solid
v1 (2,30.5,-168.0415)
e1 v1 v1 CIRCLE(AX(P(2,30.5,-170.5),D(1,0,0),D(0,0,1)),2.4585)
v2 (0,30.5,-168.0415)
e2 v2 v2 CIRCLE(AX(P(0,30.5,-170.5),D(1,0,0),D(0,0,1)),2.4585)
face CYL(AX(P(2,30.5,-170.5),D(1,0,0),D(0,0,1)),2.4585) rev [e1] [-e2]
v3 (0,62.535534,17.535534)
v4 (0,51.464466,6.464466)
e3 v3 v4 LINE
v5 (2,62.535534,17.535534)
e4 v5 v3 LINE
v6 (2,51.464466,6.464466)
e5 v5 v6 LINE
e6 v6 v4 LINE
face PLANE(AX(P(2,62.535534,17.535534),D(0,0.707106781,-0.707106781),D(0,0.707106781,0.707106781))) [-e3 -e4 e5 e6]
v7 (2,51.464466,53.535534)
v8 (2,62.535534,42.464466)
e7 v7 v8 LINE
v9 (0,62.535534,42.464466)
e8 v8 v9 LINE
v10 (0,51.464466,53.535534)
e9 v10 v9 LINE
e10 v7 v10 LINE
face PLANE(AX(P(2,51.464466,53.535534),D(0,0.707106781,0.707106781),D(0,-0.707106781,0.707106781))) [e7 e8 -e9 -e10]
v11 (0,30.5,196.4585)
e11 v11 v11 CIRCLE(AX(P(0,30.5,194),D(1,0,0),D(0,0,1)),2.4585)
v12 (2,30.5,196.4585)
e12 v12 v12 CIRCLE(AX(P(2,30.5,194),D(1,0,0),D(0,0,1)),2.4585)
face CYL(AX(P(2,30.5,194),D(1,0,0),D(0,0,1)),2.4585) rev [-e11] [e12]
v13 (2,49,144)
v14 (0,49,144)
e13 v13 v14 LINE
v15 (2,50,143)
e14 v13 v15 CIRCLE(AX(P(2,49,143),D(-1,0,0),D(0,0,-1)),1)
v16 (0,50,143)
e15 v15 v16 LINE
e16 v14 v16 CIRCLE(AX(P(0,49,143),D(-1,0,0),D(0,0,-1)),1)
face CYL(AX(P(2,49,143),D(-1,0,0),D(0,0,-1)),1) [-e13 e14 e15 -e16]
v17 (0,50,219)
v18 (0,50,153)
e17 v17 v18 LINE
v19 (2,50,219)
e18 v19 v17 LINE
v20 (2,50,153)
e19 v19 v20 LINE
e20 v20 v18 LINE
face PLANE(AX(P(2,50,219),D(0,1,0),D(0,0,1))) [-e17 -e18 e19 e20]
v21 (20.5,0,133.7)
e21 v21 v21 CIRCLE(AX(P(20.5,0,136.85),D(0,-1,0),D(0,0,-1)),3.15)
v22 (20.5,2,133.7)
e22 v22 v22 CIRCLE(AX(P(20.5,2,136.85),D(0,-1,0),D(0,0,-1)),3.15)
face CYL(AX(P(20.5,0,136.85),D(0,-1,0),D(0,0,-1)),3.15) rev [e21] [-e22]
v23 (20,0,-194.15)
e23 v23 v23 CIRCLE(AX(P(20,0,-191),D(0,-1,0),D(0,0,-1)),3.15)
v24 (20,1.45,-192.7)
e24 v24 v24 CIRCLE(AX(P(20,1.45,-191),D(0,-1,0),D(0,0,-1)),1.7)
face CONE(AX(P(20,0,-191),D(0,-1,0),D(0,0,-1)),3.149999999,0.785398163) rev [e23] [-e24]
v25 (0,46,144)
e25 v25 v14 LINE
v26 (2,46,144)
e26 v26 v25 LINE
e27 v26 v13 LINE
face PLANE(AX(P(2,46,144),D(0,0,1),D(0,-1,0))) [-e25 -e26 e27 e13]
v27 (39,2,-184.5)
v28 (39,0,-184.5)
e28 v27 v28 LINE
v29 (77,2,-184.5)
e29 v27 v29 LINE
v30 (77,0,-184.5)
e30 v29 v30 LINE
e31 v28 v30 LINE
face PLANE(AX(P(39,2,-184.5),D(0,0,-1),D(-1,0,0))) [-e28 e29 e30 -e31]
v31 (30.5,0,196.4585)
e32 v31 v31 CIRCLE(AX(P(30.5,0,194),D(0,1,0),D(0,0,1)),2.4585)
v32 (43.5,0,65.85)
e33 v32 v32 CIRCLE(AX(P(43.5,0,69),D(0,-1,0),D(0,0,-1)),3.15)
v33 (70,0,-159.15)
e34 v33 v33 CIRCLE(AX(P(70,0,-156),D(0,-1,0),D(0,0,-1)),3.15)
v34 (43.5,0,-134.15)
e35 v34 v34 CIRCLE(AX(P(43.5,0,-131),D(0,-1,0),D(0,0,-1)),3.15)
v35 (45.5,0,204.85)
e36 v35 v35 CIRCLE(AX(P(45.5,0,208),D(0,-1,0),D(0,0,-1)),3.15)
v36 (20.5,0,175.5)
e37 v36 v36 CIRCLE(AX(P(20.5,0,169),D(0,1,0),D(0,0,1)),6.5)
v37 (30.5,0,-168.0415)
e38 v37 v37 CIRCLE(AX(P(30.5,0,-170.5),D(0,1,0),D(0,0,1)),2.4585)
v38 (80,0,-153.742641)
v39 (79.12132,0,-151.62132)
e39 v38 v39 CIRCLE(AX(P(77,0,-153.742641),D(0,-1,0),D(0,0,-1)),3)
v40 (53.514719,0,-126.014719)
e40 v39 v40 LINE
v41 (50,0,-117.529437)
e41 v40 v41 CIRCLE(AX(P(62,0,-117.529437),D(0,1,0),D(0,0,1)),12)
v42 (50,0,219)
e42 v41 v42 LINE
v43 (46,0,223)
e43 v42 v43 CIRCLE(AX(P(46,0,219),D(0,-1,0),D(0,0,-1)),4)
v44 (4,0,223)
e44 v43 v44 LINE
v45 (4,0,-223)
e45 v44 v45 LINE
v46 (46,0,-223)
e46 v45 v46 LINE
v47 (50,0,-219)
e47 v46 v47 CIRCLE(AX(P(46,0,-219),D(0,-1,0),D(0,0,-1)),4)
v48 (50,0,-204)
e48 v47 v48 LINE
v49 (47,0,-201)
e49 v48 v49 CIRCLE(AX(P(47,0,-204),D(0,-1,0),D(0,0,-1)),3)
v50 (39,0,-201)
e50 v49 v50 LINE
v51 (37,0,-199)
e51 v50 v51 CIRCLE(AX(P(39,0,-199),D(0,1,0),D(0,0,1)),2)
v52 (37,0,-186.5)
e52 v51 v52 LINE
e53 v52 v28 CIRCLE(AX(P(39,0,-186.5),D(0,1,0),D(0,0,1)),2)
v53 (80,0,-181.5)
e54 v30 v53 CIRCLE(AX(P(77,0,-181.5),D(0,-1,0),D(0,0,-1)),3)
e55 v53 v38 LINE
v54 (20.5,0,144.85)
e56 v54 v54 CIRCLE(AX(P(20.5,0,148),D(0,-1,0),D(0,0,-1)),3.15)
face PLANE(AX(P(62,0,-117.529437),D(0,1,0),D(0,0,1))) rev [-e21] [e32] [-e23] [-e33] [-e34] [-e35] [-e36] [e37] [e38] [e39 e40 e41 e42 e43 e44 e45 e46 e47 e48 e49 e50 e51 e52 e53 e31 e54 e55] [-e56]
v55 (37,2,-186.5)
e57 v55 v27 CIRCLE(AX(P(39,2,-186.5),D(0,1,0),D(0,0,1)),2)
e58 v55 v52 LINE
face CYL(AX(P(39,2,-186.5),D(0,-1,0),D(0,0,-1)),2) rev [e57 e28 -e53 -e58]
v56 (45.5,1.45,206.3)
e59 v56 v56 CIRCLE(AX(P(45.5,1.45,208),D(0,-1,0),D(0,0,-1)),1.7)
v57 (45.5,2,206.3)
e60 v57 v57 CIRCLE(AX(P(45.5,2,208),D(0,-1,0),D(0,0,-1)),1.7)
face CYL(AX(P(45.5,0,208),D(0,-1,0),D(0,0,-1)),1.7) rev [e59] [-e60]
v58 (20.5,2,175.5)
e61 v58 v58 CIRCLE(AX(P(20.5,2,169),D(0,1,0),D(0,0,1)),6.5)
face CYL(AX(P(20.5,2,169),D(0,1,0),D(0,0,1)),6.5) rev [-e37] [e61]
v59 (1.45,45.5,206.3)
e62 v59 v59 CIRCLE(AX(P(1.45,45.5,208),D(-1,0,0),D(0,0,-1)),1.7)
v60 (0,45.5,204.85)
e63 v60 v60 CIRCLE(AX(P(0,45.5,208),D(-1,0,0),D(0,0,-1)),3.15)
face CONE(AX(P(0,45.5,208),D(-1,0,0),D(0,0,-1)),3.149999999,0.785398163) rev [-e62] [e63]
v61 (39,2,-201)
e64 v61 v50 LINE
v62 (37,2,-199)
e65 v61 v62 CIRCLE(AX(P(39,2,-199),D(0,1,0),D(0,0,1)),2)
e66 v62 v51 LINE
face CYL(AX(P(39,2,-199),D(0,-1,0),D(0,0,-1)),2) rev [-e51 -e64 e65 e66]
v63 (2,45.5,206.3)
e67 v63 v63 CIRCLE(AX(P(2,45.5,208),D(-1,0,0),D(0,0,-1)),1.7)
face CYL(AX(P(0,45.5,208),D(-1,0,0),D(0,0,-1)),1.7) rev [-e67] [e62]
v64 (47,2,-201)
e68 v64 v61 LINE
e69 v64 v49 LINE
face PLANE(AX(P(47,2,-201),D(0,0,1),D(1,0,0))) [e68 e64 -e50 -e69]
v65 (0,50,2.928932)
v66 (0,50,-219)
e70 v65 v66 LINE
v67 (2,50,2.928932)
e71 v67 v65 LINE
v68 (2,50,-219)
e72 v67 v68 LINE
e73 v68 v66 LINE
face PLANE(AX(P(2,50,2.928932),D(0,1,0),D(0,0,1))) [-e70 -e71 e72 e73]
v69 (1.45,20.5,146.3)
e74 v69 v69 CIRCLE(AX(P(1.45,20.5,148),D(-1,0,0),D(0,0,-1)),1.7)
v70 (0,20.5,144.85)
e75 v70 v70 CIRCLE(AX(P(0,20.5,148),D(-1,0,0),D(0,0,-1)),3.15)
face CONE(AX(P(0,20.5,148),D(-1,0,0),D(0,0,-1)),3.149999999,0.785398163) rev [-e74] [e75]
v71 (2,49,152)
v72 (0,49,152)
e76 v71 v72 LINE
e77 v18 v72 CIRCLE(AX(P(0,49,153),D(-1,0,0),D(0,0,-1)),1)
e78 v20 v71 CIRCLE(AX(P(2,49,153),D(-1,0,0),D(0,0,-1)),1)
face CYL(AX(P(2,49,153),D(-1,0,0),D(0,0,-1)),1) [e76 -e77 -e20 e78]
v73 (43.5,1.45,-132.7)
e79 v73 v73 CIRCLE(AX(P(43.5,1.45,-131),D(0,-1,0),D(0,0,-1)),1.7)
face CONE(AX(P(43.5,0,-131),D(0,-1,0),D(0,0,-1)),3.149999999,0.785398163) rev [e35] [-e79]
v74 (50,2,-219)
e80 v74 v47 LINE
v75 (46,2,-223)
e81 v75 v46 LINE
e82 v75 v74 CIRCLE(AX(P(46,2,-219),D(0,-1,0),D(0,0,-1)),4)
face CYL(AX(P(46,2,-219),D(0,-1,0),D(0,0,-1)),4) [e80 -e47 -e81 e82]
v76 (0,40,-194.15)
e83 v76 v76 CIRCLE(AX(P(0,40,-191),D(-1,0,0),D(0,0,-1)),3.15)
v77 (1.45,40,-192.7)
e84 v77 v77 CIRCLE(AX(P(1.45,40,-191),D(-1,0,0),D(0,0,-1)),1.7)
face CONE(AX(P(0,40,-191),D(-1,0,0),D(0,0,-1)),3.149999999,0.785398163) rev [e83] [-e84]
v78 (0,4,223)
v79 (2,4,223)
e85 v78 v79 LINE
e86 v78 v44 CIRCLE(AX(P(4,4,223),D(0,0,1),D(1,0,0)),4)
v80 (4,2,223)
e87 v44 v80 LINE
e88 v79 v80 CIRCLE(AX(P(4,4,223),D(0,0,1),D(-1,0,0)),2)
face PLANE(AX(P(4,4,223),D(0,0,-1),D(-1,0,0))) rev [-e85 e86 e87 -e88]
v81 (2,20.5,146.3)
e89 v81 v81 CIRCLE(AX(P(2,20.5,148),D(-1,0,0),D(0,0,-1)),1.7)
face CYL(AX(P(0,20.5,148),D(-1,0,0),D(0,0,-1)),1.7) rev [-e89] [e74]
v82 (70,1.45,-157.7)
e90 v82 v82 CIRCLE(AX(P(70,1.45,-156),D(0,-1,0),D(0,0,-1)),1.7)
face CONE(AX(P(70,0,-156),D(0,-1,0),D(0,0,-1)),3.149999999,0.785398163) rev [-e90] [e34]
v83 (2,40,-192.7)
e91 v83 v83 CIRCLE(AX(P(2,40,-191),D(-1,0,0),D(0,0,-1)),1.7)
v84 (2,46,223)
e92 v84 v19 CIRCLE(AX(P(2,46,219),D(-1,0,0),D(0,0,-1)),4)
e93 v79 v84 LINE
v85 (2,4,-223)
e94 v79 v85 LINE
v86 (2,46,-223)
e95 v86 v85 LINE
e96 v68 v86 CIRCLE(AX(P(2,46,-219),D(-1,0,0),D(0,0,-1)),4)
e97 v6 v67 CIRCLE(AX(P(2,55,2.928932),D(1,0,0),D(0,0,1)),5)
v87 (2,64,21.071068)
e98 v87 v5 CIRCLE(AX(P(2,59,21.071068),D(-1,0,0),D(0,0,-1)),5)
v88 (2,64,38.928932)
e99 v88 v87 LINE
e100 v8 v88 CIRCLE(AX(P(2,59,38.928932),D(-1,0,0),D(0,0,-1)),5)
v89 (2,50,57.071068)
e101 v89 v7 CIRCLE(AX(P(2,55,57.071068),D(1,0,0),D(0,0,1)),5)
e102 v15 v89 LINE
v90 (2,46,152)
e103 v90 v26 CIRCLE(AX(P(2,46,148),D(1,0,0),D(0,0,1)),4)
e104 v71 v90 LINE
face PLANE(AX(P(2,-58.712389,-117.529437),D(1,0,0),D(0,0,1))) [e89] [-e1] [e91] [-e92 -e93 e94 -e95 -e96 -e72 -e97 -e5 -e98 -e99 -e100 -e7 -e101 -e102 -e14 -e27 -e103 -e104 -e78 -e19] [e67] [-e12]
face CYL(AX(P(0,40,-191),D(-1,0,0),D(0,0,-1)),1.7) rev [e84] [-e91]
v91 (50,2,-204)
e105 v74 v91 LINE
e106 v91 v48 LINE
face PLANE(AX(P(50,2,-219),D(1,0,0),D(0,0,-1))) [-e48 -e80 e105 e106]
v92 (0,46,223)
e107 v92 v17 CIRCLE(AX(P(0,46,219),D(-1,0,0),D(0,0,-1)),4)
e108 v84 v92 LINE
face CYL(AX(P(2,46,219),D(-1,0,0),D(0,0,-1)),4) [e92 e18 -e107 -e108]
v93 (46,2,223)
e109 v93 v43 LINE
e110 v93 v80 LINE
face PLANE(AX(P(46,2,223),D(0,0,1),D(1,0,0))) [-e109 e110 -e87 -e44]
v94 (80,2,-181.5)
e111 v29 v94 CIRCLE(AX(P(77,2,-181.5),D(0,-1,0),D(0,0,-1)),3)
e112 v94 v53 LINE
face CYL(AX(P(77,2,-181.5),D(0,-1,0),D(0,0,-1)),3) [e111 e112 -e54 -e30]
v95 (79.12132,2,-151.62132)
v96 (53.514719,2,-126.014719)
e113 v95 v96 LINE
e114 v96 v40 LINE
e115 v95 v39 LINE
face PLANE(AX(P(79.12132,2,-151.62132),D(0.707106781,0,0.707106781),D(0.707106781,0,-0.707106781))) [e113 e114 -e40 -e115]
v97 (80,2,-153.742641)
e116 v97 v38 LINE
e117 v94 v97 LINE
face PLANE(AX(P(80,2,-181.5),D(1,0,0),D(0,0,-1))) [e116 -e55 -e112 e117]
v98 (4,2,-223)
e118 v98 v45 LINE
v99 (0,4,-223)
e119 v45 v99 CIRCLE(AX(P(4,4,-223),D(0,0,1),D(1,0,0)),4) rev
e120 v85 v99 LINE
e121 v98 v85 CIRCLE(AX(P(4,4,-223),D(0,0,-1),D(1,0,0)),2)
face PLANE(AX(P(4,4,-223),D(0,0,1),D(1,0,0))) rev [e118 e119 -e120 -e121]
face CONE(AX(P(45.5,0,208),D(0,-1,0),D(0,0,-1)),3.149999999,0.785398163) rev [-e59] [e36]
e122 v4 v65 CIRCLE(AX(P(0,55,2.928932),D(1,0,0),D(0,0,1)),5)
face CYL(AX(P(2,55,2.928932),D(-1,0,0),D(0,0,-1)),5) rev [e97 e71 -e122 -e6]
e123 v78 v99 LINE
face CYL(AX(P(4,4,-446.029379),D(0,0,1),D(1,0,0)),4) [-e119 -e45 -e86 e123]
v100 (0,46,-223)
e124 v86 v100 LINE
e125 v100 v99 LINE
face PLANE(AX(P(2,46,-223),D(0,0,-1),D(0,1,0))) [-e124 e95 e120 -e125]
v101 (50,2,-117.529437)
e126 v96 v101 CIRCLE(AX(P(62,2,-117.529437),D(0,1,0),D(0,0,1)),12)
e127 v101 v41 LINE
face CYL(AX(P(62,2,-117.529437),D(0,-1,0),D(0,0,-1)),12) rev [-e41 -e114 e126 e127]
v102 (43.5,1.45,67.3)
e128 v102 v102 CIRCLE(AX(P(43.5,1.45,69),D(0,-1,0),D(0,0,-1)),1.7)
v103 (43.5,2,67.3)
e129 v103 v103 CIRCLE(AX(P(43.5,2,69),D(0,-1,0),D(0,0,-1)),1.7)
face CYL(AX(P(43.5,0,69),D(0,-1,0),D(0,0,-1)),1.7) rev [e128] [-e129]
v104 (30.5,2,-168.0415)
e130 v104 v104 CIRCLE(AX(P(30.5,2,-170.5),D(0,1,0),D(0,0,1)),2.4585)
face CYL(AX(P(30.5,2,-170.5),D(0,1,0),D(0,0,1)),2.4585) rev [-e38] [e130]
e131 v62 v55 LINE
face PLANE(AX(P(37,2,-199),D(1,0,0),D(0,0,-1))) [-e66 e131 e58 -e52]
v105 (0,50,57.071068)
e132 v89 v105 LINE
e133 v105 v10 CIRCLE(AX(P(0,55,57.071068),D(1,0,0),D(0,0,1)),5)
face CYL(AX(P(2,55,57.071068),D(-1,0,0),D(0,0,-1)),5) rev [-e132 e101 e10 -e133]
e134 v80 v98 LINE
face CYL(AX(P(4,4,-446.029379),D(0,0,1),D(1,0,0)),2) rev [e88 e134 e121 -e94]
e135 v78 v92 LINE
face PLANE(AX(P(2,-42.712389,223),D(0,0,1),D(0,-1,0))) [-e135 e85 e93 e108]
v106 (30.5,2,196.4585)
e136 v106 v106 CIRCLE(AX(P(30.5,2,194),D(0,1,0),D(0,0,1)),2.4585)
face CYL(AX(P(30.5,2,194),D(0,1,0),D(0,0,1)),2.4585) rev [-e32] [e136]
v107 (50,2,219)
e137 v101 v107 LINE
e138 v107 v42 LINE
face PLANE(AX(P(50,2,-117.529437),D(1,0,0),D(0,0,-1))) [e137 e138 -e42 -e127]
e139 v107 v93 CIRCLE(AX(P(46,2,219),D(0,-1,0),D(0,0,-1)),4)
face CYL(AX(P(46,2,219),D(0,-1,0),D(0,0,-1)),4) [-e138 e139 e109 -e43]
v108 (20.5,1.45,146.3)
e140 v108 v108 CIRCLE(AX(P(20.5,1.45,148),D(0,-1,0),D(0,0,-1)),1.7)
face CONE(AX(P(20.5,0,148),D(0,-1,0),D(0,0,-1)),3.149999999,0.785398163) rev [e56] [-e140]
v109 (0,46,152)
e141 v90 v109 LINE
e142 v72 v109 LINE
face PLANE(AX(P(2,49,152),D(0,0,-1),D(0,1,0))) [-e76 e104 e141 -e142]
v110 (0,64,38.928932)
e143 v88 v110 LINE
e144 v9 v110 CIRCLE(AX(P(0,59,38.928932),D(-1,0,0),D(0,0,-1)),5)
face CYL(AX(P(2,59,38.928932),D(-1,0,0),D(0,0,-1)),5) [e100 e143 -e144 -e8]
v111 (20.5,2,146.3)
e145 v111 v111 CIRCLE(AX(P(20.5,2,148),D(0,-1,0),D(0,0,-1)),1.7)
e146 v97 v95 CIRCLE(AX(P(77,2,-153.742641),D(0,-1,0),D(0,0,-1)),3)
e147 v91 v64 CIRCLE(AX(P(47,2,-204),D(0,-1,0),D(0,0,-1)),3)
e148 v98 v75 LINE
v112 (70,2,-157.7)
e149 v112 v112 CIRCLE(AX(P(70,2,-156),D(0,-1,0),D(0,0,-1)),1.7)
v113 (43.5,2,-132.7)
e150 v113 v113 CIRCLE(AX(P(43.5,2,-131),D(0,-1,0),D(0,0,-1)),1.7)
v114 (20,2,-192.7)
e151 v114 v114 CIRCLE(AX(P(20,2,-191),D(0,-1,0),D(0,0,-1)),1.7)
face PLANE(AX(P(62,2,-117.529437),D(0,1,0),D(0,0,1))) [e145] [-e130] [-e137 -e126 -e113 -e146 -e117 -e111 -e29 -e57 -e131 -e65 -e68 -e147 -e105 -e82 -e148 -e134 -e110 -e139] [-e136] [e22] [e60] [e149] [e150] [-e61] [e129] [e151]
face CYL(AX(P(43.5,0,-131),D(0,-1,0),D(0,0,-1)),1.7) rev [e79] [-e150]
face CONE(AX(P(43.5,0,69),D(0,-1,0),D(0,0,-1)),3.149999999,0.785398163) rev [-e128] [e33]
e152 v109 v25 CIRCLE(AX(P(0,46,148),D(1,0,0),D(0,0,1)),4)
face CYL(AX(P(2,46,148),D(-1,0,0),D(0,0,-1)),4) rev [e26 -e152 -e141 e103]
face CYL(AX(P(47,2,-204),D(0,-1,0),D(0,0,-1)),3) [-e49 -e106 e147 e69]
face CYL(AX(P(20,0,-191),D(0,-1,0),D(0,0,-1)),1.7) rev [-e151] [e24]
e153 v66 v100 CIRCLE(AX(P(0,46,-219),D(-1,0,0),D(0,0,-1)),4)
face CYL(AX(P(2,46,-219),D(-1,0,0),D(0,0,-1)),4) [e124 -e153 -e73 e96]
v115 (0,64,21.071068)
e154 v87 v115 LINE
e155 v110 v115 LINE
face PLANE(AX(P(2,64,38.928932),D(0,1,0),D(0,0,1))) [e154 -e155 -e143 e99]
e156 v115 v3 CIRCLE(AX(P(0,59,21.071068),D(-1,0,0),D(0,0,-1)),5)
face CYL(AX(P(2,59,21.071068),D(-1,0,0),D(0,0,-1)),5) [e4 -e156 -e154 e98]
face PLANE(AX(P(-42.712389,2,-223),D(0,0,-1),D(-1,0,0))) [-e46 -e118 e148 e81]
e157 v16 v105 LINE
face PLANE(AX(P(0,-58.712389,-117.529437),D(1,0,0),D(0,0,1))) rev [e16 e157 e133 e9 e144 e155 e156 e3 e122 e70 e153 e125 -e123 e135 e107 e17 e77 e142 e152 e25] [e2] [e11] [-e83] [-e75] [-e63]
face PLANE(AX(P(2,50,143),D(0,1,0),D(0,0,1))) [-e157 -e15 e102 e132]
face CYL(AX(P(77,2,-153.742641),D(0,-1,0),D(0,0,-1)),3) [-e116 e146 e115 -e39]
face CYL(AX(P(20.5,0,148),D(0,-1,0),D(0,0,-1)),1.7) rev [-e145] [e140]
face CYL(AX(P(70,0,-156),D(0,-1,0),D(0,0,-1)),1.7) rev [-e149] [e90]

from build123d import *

# Parameters (mm, degrees)
BOSS_EXTRUDE1_DEPTH                            = 2
F_6_3_6_3_DIAMETER_HOLE1_D                     = 6.3
HOLE1_D                                        = 4.917
F_13_0_13_DIAMETER_HOLE1_D                     = 13
CSK_FOR_M3_FLAT_HEAD_MACHINE_SCREW1_AT_2_COUNT = 2
CSK_FOR_M3_FLAT_HEAD_MACHINE_SCREW1_AT_2_PITCH = 339.560377547
CSK_FOR_M3_FLAT_HEAD_MACHINE_SCREW1_AT_3_COUNT = 2
CSK_FOR_M3_FLAT_HEAD_MACHINE_SCREW1_AT_3_PITCH = 37.712388981
CSK_FOR_M3_FLAT_HEAD_MACHINE_SCREW1_AT_4_COUNT = 2
CSK_FOR_M3_FLAT_HEAD_MACHINE_SCREW1_AT_4_PITCH = 99.634302204
CSK_FOR_M3_FLAT_HEAD_MACHINE_SCREW1_AT_5_COUNT = 2
CSK_FOR_M3_FLAT_HEAD_MACHINE_SCREW1_AT_5_PITCH = 285.529322795
CSK_FOR_M3_FLAT_HEAD_MACHINE_SCREW1_AT_6_COUNT = 2
CSK_FOR_M3_FLAT_HEAD_MACHINE_SCREW1_AT_6_PITCH = 316.26255041
CSK_FOR_M3_FLAT_HEAD_MACHINE_SCREW1_AT_7_COUNT = 2
CSK_FOR_M3_FLAT_HEAD_MACHINE_SCREW1_AT_7_PITCH = 341.036305829
CSK_FOR_M3_FLAT_HEAD_MACHINE_SCREW1_AT_8_COUNT = 2
CSK_FOR_M3_FLAT_HEAD_MACHINE_SCREW1_AT_8_PITCH = 86.791956607
CSK_FOR_M3_FLAT_HEAD_MACHINE_SCREW1_AT_9_COUNT = 2
CSK_FOR_M3_FLAT_HEAD_MACHINE_SCREW1_AT_9_PITCH = 65
SKETCHED_START                                 = -60.712388981
SKETCHED_BEND1_OUTLINE_W                       = 2
SKETCHED_BEND1_OUTLINE_H                       = 446.00000001
SKETCHED_BEND1_DEPTH                           = 61.123348981
SKETCHED_START_2                               = 1.400733568
SKETCHED_BEND1_2_OUTLINE_R                     = 2.4585
SKETCHED_BEND1_2_OUTLINE_R_2                   = 1.7
SKETCHED_BEND1_2_DEPTH                         = 0.599266432
SKETCHED_BEND1_3_OUTLINE_R                     = 2.4585
SKETCHED_BEND1_3_OUTLINE_R_2                   = 1.7
SKETCHED_BEND1_3_DEPTH                         = 4
SKETCHED_START_3                               = -224
SKETCHED_BEND1_4_DEPTH                         = 448


with BuildPart() as part:
    # Sketch5 → Boss-Extrude1 (new body)
    with BuildSketch(Plane.XZ):
        with BuildLine():
            Line((50.000000006, -117.529437252), (50.000000006, 219.000000006))
            ThreePointArc((50.000000006, 219.000000006), (48.82842713, 221.828427132), (46.000000004, 223.000000008))
            Line((46.000000004, 223.000000008), (-42.712388976, 223.000000008))
            ThreePointArc((-42.712388976, 223.000000008), (-45.540816105, 221.828427131), (-46.712388981, 219.000000003))
            Line((-46.712388981, 219.000000003), (-46.712388981, 153.000000003))
            ThreePointArc((-46.712388981, 153.000000003), (-46.419495765, 152.292893227), (-45.712388989, 152.00000001))
            Line((-45.712388989, 152.00000001), (-42.712388991, 152.00000001))
            ThreePointArc((-42.712388991, 152.00000001), (-38.712388981, 148), (-42.712388991, 143.99999999))
            Line((-42.712388991, 143.99999999), (-45.712388994, 143.99999999))
            ThreePointArc((-45.712388994, 143.99999999), (-46.419495766, 143.707106775), (-46.712388981, 143.000000003))
            Line((-46.712388981, 143.000000003), (-46.712388981, 57.071067809))
            ThreePointArc((-46.712388981, 57.071067809), (-47.092991321, 55.157650638), (-48.176855083, 53.535533886))
            Line((-48.176855083, 53.535533886), (-59.247922895, 42.464466074))
            ThreePointArc((-59.247922895, 42.464466074), (-60.331786645, 40.842349339), (-60.712388981, 38.928932188))
            Line((-60.712388981, 38.928932188), (-60.712388981, 21.071067812))
            ThreePointArc((-60.712388981, 21.071067812), (-60.331786645, 19.157650661), (-59.247922895, 17.535533927))
            Line((-59.247922895, 17.535533927), (-48.176855083, 6.464466115))
            ThreePointArc((-48.176855083, 6.464466115), (-47.092991321, 4.842349362), (-46.712388981, 2.928932191))
            Line((-46.712388981, 2.928932191), (-46.712388981, -218.999999997))
            ThreePointArc((-46.712388981, -218.999999997), (-45.540816105, -221.828427126), (-42.712388976, -223.000000002))
            Line((-42.712388976, -223.000000002), (46.000000004, -223.000000002))
            ThreePointArc((46.000000004, -223.000000002), (48.82842713, -221.828427127), (50.000000006, -219))
            Line((50.000000006, -219), (50.000000006, -204))
            ThreePointArc((50.000000006, -204), (49.121320358, -201.878679676), (47.000000033, -201.000000027))
            Line((47.000000033, -201.000000027), (39.000000033, -201.000000027))
            ThreePointArc((39.000000033, -201.000000027), (37.585786446, -200.41421358), (36.999999998, -198.999999992))
            Line((36.999999998, -198.999999992), (36.999999998, -186.499999992))
            ThreePointArc((36.999999998, -186.499999992), (37.585786439, -185.085786422), (39.000000009, -184.499999981))
            Line((39.000000009, -184.499999981), (77.000000009, -184.499999981))
            ThreePointArc((77.000000009, -184.499999981), (79.121320349, -183.621320326), (80.000000004, -181.499999986))
            Line((80.000000004, -181.499999986), (80.000000004, -153.742640692))
            ThreePointArc((80.000000004, -153.742640692), (79.771638599, -152.594590381), (79.121320338, -151.621320324))
            Line((79.121320338, -151.621320324), (53.514718626, -126.014718612))
            ThreePointArc((53.514718626, -126.014718612), (50.913445614, -122.121638433), (50.000000006, -117.529437252))
        make_face()
    extrude(amount=-BOSS_EXTRUDE1_DEPTH)

    # Ø6.3 (6.3) Diameter Hole1 (through all)
    with Locations(Plane(origin=(0, 0, 0), x_dir=(-1, 0, 0), z_dir=(0, -1, 0))):
        with Locations((-20.5, -136.85)):
            Hole(F_6_3_6_3_DIAMETER_HOLE1_D / 2)

    # Hole1 (through all)
    with Locations(Plane(origin=(0, 2, 0), x_dir=(1, 0, 0), z_dir=(0, 1, 0))):
        with Locations((30.5, 170.5), (30.5, -194), (-27.212388981, -194), (-27.212388981, 170.5)):
            Hole(HOLE1_D / 2)

    # Ø13.0 (13) Diameter Hole1 (through all)
    with Locations(Plane(origin=(0, 2, 0), x_dir=(1, 0, 0), z_dir=(0, 1, 0))):
        with Locations((20.5, -169)):
            Hole(F_13_0_13_DIAMETER_HOLE1_D / 2)

    # Sketch12 → CSK for M3 Flat Head Machine Screw1 (revolve, cut)
    with BuildSketch(Plane(origin=(-17.212388981, 0, 148), x_dir=(0, 0, -1), z_dir=(1, 0, 0))):
        Polygon((0, 0), (0, 2), (1.7, 2), (1.7, 1.450000001), (3.149999999, 0), align=None)
    csk_for_m3_flat_head_machine_screw1 = revolve(axis=Axis((-17.212388981, -6.35, 148), (0, 1, 0)), mode=Mode.SUBTRACT)

    # CSK for M3 Flat Head Machine Screw1 at 2: CSK for M3 Flat Head Machine Screw1 ×2
    with Locations(*[Vector(-0.0574271949538317, 0, -0.9983496968896894) * (i * CSK_FOR_M3_FLAT_HEAD_MACHINE_SCREW1_AT_2_PITCH) for i in range(1, CSK_FOR_M3_FLAT_HEAD_MACHINE_SCREW1_AT_2_COUNT)]):
        add(csk_for_m3_flat_head_machine_screw1, mode=Mode.SUBTRACT)

    # CSK for M3 Flat Head Machine Screw1 at 3: CSK for M3 Flat Head Machine Screw1 ×2
    with Locations(*[(i * CSK_FOR_M3_FLAT_HEAD_MACHINE_SCREW1_AT_3_PITCH, 0, 0) for i in range(1, CSK_FOR_M3_FLAT_HEAD_MACHINE_SCREW1_AT_3_COUNT)]):
        add(csk_for_m3_flat_head_machine_screw1, mode=Mode.SUBTRACT)

    # CSK for M3 Flat Head Machine Screw1 at 4: CSK for M3 Flat Head Machine Screw1 ×2
    with Locations(*[Vector(0.6093522776533882, 0, -0.7928996164197761) * (i * CSK_FOR_M3_FLAT_HEAD_MACHINE_SCREW1_AT_4_PITCH) for i in range(1, CSK_FOR_M3_FLAT_HEAD_MACHINE_SCREW1_AT_4_COUNT)]):
        add(csk_for_m3_flat_head_machine_screw1, mode=Mode.SUBTRACT)

    # CSK for M3 Flat Head Machine Screw1 at 5: CSK for M3 Flat Head Machine Screw1 ×2
    with Locations(*[Vector(0.21263101241678778, 0, -0.9771325665223792) * (i * CSK_FOR_M3_FLAT_HEAD_MACHINE_SCREW1_AT_5_PITCH) for i in range(1, CSK_FOR_M3_FLAT_HEAD_MACHINE_SCREW1_AT_5_COUNT)]):
        add(csk_for_m3_flat_head_machine_screw1, mode=Mode.SUBTRACT)

    # CSK for M3 Flat Head Machine Screw1 at 6: CSK for M3 Flat Head Machine Screw1 ×2
    with Locations(*[Vector(0.2757594563996407, 0, -0.9612266757670507) * (i * CSK_FOR_M3_FLAT_HEAD_MACHINE_SCREW1_AT_6_PITCH) for i in range(1, CSK_FOR_M3_FLAT_HEAD_MACHINE_SCREW1_AT_6_COUNT)]):
        add(csk_for_m3_flat_head_machine_screw1, mode=Mode.SUBTRACT)

    # CSK for M3 Flat Head Machine Screw1 at 7: CSK for M3 Flat Head Machine Screw1 ×2
    with Locations(*[Vector(0.10911562301287396, 0, -0.994029064371114) * (i * CSK_FOR_M3_FLAT_HEAD_MACHINE_SCREW1_AT_7_PITCH) for i in range(1, CSK_FOR_M3_FLAT_HEAD_MACHINE_SCREW1_AT_7_COUNT)]):
        add(csk_for_m3_flat_head_machine_screw1, mode=Mode.SUBTRACT)

    # CSK for M3 Flat Head Machine Screw1 at 8: CSK for M3 Flat Head Machine Screw1 ×2
    with Locations(*[Vector(0.7225599172123858, 0, 0.6913083002814522) * (i * CSK_FOR_M3_FLAT_HEAD_MACHINE_SCREW1_AT_8_PITCH) for i in range(1, CSK_FOR_M3_FLAT_HEAD_MACHINE_SCREW1_AT_8_COUNT)]):
        add(csk_for_m3_flat_head_machine_screw1, mode=Mode.SUBTRACT)

    # CSK for M3 Flat Head Machine Screw1 at 9: CSK for M3 Flat Head Machine Screw1 ×2
    with Locations(*[Vector(-0.3846153846153844, 0, 0.9230769230769231) * (i * CSK_FOR_M3_FLAT_HEAD_MACHINE_SCREW1_AT_9_PITCH) for i in range(1, CSK_FOR_M3_FLAT_HEAD_MACHINE_SCREW1_AT_9_COUNT)]):
        add(csk_for_m3_flat_head_machine_screw1, mode=Mode.SUBTRACT)

    # Sketched Bend1: read off the stored shape, not the designer's step
    # Sketched Bend1 outline → Sketched Bend1 (cut)
    with BuildSketch(Plane.YZ.offset(SKETCHED_START)):
        with Locations((1, 3e-09)):
            Rectangle(SKETCHED_BEND1_OUTLINE_W, SKETCHED_BEND1_OUTLINE_H)
    extrude(amount=SKETCHED_BEND1_DEPTH, mode=Mode.SUBTRACT)

    # Sketched Bend1 2 outline → Sketched Bend1 2 (add)
    with BuildSketch(Plane.YZ.offset(SKETCHED_START_2)):
        with BuildLine():
            Line((2, -223.000000002), (45.999999996, -223.000000002))
            ThreePointArc((45.999999996, -223.000000002), (48.828427124, -221.828427126), (50.000000001, -218.999999997))
            Line((50.000000001, -218.999999997), (50.000000001, 2.928932191))
            ThreePointArc((50.000000001, 2.928932191), (50.38060234, 4.842349363), (51.464466103, 6.464466115))
            Line((51.464466103, 6.464466115), (62.535533915, 17.535533927))
            ThreePointArc((62.535533915, 17.535533927), (63.619397665, 19.157650661), (64, 21.071067812))
            Line((64, 21.071067812), (64, 38.928932188))
            ThreePointArc((64, 38.928932188), (63.619397665, 40.842349339), (62.535533914, 42.464466074))
            Line((62.535533914, 42.464466074), (51.464466102, 53.535533886))
            ThreePointArc((51.464466102, 53.535533886), (50.38060234, 55.157650638), (50.000000001, 57.071067809))
            Line((50.000000001, 57.071067809), (50.000000001, 143.000000003))
            ThreePointArc((50.000000001, 143.000000003), (49.707106786, 143.707106775), (49.000000014, 143.99999999))
            Line((49.000000014, 143.99999999), (46.000000011, 143.99999999))
            ThreePointArc((46.000000011, 143.99999999), (42.000000001, 148), (46.000000011, 152.00000001))
            Line((46.000000011, 152.00000001), (49.000000009, 152.00000001))
            ThreePointArc((49.000000009, 152.00000001), (49.707106784, 152.292893227), (50.000000001, 153.000000003))
            Line((50.000000001, 153.000000003), (50.000000001, 219.000000003))
            ThreePointArc((50.000000001, 219.000000003), (48.828427124, 221.828427131), (45.999999996, 223.000000008))
            Line((45.999999996, 223.000000008), (2, 223.000000008))
            Line((2, 223.000000008), (2, -223.000000002))
        make_face()
        with Locations((30.5, -170.5)):
            Circle(SKETCHED_BEND1_2_OUTLINE_R, mode=Mode.SUBTRACT)
        with Locations((40, -191)):
            Circle(SKETCHED_BEND1_2_OUTLINE_R_2, mode=Mode.SUBTRACT)
        with Locations((20.5, 148)):
            Circle(SKETCHED_BEND1_2_OUTLINE_R_2, mode=Mode.SUBTRACT)
        with Locations((30.5, 194)):
            Circle(SKETCHED_BEND1_2_OUTLINE_R, mode=Mode.SUBTRACT)
        with Locations((45.5, 208)):
            Circle(SKETCHED_BEND1_2_OUTLINE_R_2, mode=Mode.SUBTRACT)
    extrude(amount=SKETCHED_BEND1_2_DEPTH)

    # Sketched Bend1 3 outline → Sketched Bend1 3 (add)
    with BuildSketch(Plane.YZ):
        with BuildLine():
            Line((2, -223.000000002), (45.999999996, -223.000000002))
            ThreePointArc((45.999999996, -223.000000002), (48.828427124, -221.828427126), (50.000000001, -218.999999997))
            Line((50.000000001, -218.999999997), (50.000000001, 2.928932191))
            ThreePointArc((50.000000001, 2.928932191), (50.38060234, 4.842349363), (51.464466103, 6.464466115))
            Line((51.464466103, 6.464466115), (62.535533915, 17.535533927))
            ThreePointArc((62.535533915, 17.535533927), (63.619397665, 19.157650661), (64, 21.071067812))
            Line((64, 21.071067812), (64, 38.928932188))
            ThreePointArc((64, 38.928932188), (63.619397665, 40.842349339), (62.535533914, 42.464466074))
            Line((62.535533914, 42.464466074), (51.464466102, 53.535533886))
            ThreePointArc((51.464466102, 53.535533886), (50.38060234, 55.157650638), (50.000000001, 57.071067809))
            Line((50.000000001, 57.071067809), (50.000000001, 143.000000003))
            ThreePointArc((50.000000001, 143.000000003), (49.707106786, 143.707106775), (49.000000014, 143.99999999))
            Line((49.000000014, 143.99999999), (46.000000011, 143.99999999))
            ThreePointArc((46.000000011, 143.99999999), (42.000000001, 148), (46.000000011, 152.00000001))
            Line((46.000000011, 152.00000001), (49.000000009, 152.00000001))
            ThreePointArc((49.000000009, 152.00000001), (49.707106784, 152.292893227), (50.000000001, 153.000000003))
            Line((50.000000001, 153.000000003), (50.000000001, 219.000000003))
            ThreePointArc((50.000000001, 219.000000003), (48.828427124, 221.828427131), (45.999999996, 223.000000008))
            Line((45.999999996, 223.000000008), (2, 223.000000008))
            Line((2, 223.000000008), (2, -223.000000002))
        make_face()
        with Locations((30.5, -170.5)):
            Circle(SKETCHED_BEND1_3_OUTLINE_R, mode=Mode.SUBTRACT)
        with Locations((40, -191)):
            Circle(SKETCHED_BEND1_3_OUTLINE_R_2, mode=Mode.SUBTRACT)
        with Locations((20.5, 148)):
            Circle(SKETCHED_BEND1_3_OUTLINE_R_2, mode=Mode.SUBTRACT)
        with Locations((30.5, 194)):
            Circle(SKETCHED_BEND1_3_OUTLINE_R, mode=Mode.SUBTRACT)
        with Locations((45.5, 208)):
            Circle(SKETCHED_BEND1_3_OUTLINE_R_2, mode=Mode.SUBTRACT)
    extrude(amount=SKETCHED_BEND1_3_DEPTH)

    # Sketched Bend1 4 outline → Sketched Bend1 4 (cut)
    with BuildSketch(Plane.XY.offset(SKETCHED_START_3)):
        with BuildLine():
            ThreePointArc((4, 0), (1.171572875, 1.171572875), (0, 4))
            Line((0, 4), (0, 2))
            Line((0, 2), (0.41096, 2))
            Line((0.41096, 2), (0.41096, 0))
            Line((0.41096, 0), (4, 0))
        make_face()
        with BuildLine():
            ThreePointArc((2, 4), (2.585786438, 2.585786438), (4, 2))
            Line((4, 2), (4, 64))
            Line((4, 64), (2, 64))
            Line((2, 64), (2, 4))
        make_face()
    extrude(amount=SKETCHED_BEND1_4_DEPTH, mode=Mode.SUBTRACT)

    # Sketched Bend1 5 outline → Sketched Bend1 5 (revolve, cut)
    with BuildSketch(Plane(origin=(0, 45.5, 208), x_dir=(0, 1, 0), z_dir=(0, 0, -1))):
        Polygon((3.149999999, 0), (1.7, 1.450000001), (1.7, 0), align=None)
    revolve(axis=Axis((0, 45.5, 208), (1, 0, 0)), mode=Mode.SUBTRACT)

    # Sketched Bend1 6 outline → Sketched Bend1 6 (revolve, cut)
    with BuildSketch(Plane(origin=(0, 40, -191), x_dir=(0, 1, 0), z_dir=(0, 0, -1))):
        Polygon((3.149999999, 0), (1.7, 1.450000001), (1.7, 0), align=None)
    revolve(axis=Axis((0, 40, -191), (1, 0, 0)), mode=Mode.SUBTRACT)

    # Sketched Bend1 7 outline → Sketched Bend1 7 (revolve, cut)
    with BuildSketch(Plane(origin=(0, 20.5, 148), x_dir=(0, 1, 0), z_dir=(0, 0, -1))):
        Polygon((3.149999999, 0), (1.7, 1.450000001), (1.7, 0), align=None)
    revolve(axis=Axis((0, 20.5, 148), (1, 0, 0)), mode=Mode.SUBTRACT)


solid = part.part
